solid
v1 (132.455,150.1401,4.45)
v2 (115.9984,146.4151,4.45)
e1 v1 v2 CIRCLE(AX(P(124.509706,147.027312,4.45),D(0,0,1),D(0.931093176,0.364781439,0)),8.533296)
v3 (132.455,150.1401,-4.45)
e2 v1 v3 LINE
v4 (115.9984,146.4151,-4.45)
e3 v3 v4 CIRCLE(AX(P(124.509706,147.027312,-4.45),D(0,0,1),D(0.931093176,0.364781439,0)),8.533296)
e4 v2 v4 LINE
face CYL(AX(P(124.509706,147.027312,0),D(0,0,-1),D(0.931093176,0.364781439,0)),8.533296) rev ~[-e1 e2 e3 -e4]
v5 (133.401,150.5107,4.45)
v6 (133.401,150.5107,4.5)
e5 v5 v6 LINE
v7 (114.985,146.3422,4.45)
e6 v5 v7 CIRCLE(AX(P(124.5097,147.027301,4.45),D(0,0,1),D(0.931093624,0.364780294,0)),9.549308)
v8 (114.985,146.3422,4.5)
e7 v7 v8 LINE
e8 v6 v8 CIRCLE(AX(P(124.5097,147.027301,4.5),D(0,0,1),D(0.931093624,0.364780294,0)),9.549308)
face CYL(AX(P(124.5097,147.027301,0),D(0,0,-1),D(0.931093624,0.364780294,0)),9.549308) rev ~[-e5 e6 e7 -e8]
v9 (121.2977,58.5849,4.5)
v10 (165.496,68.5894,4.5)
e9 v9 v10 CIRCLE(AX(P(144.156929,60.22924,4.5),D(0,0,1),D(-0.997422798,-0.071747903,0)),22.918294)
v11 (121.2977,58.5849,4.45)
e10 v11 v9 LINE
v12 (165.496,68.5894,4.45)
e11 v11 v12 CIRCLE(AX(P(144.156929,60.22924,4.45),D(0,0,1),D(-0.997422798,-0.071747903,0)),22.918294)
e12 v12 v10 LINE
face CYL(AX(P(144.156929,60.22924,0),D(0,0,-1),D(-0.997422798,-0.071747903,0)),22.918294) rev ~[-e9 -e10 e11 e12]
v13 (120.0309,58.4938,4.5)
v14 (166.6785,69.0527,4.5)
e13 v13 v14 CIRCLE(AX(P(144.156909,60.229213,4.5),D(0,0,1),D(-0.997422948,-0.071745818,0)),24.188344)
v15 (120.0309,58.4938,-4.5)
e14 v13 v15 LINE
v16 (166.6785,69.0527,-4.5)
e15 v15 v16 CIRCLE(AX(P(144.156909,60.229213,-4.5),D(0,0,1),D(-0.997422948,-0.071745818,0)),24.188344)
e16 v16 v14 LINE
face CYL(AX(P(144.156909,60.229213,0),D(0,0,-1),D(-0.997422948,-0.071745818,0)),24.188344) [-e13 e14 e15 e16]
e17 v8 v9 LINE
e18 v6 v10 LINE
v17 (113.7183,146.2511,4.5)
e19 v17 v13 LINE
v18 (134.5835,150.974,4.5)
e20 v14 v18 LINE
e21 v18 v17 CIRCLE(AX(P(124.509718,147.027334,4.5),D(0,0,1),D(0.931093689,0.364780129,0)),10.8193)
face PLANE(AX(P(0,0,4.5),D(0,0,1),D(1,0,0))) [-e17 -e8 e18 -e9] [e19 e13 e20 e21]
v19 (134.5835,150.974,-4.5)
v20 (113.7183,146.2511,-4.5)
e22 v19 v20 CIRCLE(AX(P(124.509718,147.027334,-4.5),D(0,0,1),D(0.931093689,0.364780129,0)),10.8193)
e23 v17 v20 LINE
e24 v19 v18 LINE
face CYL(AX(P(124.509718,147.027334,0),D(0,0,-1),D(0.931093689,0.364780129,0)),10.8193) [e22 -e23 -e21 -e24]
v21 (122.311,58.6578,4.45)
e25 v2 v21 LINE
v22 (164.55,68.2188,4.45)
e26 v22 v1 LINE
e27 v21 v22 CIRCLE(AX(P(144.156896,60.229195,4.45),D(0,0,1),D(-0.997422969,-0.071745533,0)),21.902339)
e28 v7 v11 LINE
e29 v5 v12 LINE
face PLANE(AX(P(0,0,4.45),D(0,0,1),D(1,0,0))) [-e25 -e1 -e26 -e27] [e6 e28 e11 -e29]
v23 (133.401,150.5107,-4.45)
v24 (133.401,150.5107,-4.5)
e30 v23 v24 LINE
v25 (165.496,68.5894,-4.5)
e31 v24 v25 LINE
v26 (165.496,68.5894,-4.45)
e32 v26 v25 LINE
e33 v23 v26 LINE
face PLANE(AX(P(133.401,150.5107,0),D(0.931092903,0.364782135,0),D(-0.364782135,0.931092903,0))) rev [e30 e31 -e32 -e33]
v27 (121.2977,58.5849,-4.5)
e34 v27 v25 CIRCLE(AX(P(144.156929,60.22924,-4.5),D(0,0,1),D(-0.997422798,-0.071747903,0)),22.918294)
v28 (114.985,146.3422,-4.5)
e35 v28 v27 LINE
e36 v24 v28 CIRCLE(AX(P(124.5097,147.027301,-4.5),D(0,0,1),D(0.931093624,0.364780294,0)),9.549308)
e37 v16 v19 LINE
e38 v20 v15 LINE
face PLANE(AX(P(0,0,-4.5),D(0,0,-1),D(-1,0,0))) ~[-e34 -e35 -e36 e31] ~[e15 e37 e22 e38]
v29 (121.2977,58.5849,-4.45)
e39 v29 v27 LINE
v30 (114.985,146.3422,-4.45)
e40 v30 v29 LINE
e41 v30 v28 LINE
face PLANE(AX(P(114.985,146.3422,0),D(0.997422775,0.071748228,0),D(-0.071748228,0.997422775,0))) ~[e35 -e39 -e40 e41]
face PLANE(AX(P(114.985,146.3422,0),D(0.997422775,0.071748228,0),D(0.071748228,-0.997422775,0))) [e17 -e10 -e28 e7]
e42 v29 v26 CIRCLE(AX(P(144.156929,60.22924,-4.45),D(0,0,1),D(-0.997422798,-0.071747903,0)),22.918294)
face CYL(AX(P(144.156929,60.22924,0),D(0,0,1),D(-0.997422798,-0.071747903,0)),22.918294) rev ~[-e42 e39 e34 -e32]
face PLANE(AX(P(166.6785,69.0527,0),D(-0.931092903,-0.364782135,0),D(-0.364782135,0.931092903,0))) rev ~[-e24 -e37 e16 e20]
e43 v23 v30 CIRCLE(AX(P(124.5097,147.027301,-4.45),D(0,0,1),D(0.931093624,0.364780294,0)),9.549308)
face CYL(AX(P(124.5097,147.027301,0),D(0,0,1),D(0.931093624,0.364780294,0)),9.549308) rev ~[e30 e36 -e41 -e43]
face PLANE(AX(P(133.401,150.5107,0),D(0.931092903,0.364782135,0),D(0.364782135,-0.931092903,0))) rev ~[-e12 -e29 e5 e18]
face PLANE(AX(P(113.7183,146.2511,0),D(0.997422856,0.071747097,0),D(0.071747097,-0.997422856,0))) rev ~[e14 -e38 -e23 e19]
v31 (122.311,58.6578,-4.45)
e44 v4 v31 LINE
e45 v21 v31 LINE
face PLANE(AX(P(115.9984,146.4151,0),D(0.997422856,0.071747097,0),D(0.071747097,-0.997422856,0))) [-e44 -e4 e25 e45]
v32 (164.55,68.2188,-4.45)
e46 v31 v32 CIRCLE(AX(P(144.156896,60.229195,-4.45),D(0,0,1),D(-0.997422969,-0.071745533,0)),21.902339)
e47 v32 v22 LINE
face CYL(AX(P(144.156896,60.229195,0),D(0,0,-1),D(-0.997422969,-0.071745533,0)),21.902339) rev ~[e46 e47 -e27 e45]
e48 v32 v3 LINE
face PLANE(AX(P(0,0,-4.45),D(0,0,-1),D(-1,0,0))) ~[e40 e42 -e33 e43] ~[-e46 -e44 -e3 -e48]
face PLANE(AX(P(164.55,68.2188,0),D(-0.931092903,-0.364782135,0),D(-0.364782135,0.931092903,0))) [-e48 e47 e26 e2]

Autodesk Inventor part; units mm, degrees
ref_plane "YZ Plane" through (0, 0, 0) normal (1, 0, 0) x (0, 1, 0)
ref_plane "XZ Plane" through (0, 0, 0) normal (0, 1, 0) x (-1, 0, 0)
ref_plane "XY Plane" through (0, 0, 0) normal (0, 0, 1) x (1, 0, 0)
sketch "Main Outline" plane through (0, 0, 0) normal (0, 0, 1) x (1, 0, 0)
  line L0 (0, 0) -> (304.8, 0) construction
  line L1 (304.8, 0) -> (304.8, 50.8) construction
  line L2 (304.8, 50.8) -> (0, 50.8) construction
  line L3 (0, 50.8) -> (0, 0) construction
  line L4 (0, 50.8) -> (0, 53.34) construction
  line L5 (0, 53.34) -> (304.8, 53.34) construction
  line L6 (304.8, 53.34) -> (304.8, 50.8) construction
  circle A0 centre (152.4, 23.8125) radius 17.4625 construction
  line L7 (152.4, 23.8125) -> (152.4, 0) construction
  circle A1 centre (152.4, 23.8125) radius 27.94 construction
  circle A2 centre (152.4, 23.8125) radius 21.59 construction
  line L8 (152.4, 23.8125) -> (144.1569, 60.2292) construction
  circle A3 centre (144.1569, 60.2292) radius 15.24 construction
  circle A4 centre (144.1569, 60.2292) radius 8.89 construction
  circle A5 centre (144.1569, 60.2292) radius 14.2875 construction
  arc A6 (163.8162, 72.0089) -> (128.198, 43.7805) centre (144.1569, 60.2292) ccw construction
  circle A7 centre (98.8106, 85.598) radius 32.258 construction
  circle A8 centre (124.5097, 147.0273) radius 32.258 construction
  circle A9 centre (174.158, 102.6533) radius 32.258 construction
  circle A10 centre (144.1569, 60.2292) radius 11.1125 construction
  circle A11 centre (152.4, 23.8125) radius 49.53 construction
  line L9 (144.1569, 60.2292) -> (124.5097, 147.0273) construction
  line L10 (144.1569, 60.2292) -> (98.8106, 85.598) construction
  line L11 (98.8106, 85.598) -> (174.158, 102.6533) construction
  line L12 (174.158, 102.6533) -> (144.1569, 60.2292) construction
  circle A12 centre (98.8106, 85.598) radius 9.5493 construction
  arc A13 (172.0498, 111.9669) -> (183.1109, 99.3313) centre (174.158, 102.6533) ccw construction
  circle A14 centre (124.5097, 147.0273) radius 9.5493 construction
  line L13 (96.7024, 94.9117) -> (172.0498, 111.9669) construction
  line L14 (183.1109, 99.3313) -> (165.6438, 52.2565) construction
  line L15 (92.161, 78.7444) -> (128.198, 43.7805) construction
  line L16 (172.0498, 111.9669) -> (174.158, 102.6533) construction
  line L17 (174.158, 102.6533) -> (183.1109, 99.3313) construction
  arc A15 (183.1109, 99.3313) -> (172.0498, 111.9669) centre (174.158, 102.6533) ccw construction
  arc A16 (165.6438, 52.2565) -> (163.8162, 72.0089) centre (144.1569, 60.2292) ccw construction
  arc A17 (128.198, 43.7805) -> (165.6438, 52.2565) centre (144.1569, 60.2292) ccw construction
  circle A18 centre (124.4396, 147.337) radius 32.258 construction
  circle A19 centre (124.3695, 147.6466) radius 32.258 construction
  circle A20 centre (124.2994, 147.9563) radius 32.258 construction
  line L18 (124.5097, 147.0273) -> (124.2994, 147.9563) construction
  circle A21 centre (124.5798, 146.7176) radius 32.258 construction
  circle A22 centre (117.4622, 43.2997) radius 9.525 construction
  circle A23 centre (175.54, 56.4459) radius 9.525 construction
  line L19 (152.4, 23.8125) -> (117.4622, 43.2997) construction
  line L20 (152.4, 23.8125) -> (175.54, 56.4459) construction
  line L21 (117.4622, 43.2997) -> (98.8106, 85.598) construction
  line L22 (175.54, 56.4459) -> (174.158, 102.6533) construction
  circle A24 centre (133.7342, 106.2753) radius 7.9375 construction
  line L23 (133.401, 150.5107) -> (165.496, 68.5894) construction
  circle A25 centre (152.4, 23.8125) radius 29.845 construction
  line L24 (114.985, 146.3422) -> (121.2977, 58.5849) construction
  circle A26 centre (99.0876, 85.443) radius 32.258 construction
  circle A27 centre (97.9793, 86.063) radius 32.258 construction
  line L25 (97.9793, 86.063) -> (98.8106, 85.598) construction
  circle A28 centre (98.2564, 85.908) radius 32.258 construction
  circle A29 centre (98.5335, 85.753) radius 32.258 construction
  circle A30 centre (152.4, 23.8125) radius 29.845 construction
  circle A31 centre (122.555, 23.8125) radius 6.35 construction
  circle A32 centre (179.3358, 36.6651) radius 6.35 construction
  line L26 (122.555, 23.8125) -> (152.4, 23.8125) construction
  line L27 (152.4, 23.8125) -> (182.245, 23.8125) construction
  circle A33 centre (182.245, 23.8125) radius 6.35 construction
  circle A34 centre (125.4642, 10.9599) radius 6.35 construction
  circle A35 centre (150.1885, 33.5827) radius 39.8623 construction
  line L28 (72.8944, 65.7819) -> (119.1902, 8.5205) construction
  circle A36 centre (174.708, 103.431) radius 32.258 construction
  line L29 (174.158, 102.6533) -> (174.708, 103.431) construction
  circle A37 centre (174.5246, 103.1717) radius 32.258 construction
  circle A38 centre (174.3413, 102.9125) radius 32.258 construction
  circle A39 centre (173.9747, 102.394) radius 32.258 construction
  line L30 (188.958, 24.3128) -> (206.0816, 95.9295) construction
  circle A40 centre (133.7342, 106.2753) radius 8.1693 construction
  arc A41 (85.4541, 115.7901) -> (94.2274, 135.7949) centre (79.2901, 130.4196) ccw construction
  arc A42 (156.6774, 149.9308) -> (173.2104, 135.6542) centre (172.4734, 151.5121) ccw construction
  line L31 (124.2994, 147.9563) -> (124.8602, 145.479) construction
  line L32 (114.3901, 145.7133) -> (114.9509, 143.236) construction
  line L33 (134.7695, 147.722) -> (134.2088, 150.1993) construction
  arc A43 (134.2088, 150.1993) -> (114.3901, 145.7133) centre (124.2994, 147.9563) ccw construction
  arc A44 (114.9509, 143.236) -> (134.7695, 147.722) centre (124.8602, 145.479) ccw construction
  line L34 (174.708, 103.431) -> (173.2414, 101.3571) construction
  line L35 (166.4126, 109.2972) -> (164.9461, 107.2234) construction
  line L36 (181.5368, 95.4909) -> (183.0033, 97.5647) construction
  arc A45 (183.0033, 97.5647) -> (166.4126, 109.2972) centre (174.708, 103.431) ccw construction
  arc A46 (164.9461, 107.2234) -> (181.5368, 95.4909) centre (173.2414, 101.3571) ccw construction
  line L37 (97.9793, 86.063) -> (100.196, 84.8229) construction
  line L38 (93.0188, 77.1963) -> (95.2355, 75.9562) construction
  line L39 (105.1564, 93.6897) -> (102.9398, 94.9298) construction
  arc A47 (102.9398, 94.9298) -> (93.0188, 77.1963) centre (97.9793, 86.063) ccw construction
  arc A48 (95.2355, 75.9562) -> (105.1564, 93.6897) centre (100.196, 84.8229) ccw construction
  circle A49 centre (117.4622, 43.2997) radius 3.9687 construction
  circle A50 centre (175.54, 56.4459) radius 3.9687 construction
  line L40 (152.4, 23.8125) -> (158.9889, -5.2961) construction
  arc A51 (89.3511, 54.6895) -> (85.9237, 49.6664) centre (88.3927, 51.6626) ccw construction
  arc A52 (201.2624, 75.7739) -> (196.006, 78.8314) centre (198.1744, 76.5122) ccw construction
  circle A53 centre (152.4, 23.8125) radius 14.224 construction
  circle A54 centre (133.7342, 106.2753) radius 3.9687 construction
  circle A55 centre (156.886, 3.9939) radius 6.35 construction
  circle A56 centre (156.886, 3.9939) radius 2.0828 construction
  circle A57 centre (152.4, 23.8125) radius 20.32 construction
  line L41 (132.9935, 29.8368) -> (152.4, 23.8125) construction
  line L42 (152.4, 23.8125) -> (167.3204, 37.6068) construction
  circle A58 centre (167.3204, 37.6068) radius 2.0828 construction
  circle A59 centre (167.3204, 37.6068) radius 3.9687 construction
  circle A60 centre (132.9935, 29.8368) radius 2.0828 construction
  circle A61 centre (132.9935, 29.8368) radius 3.9688 construction
  point P0 (173.9747, 102.394)
  point P1 (99.0876, 85.443)
  dimension "d18" = 99.06
  dimension "d58" = 64.516
  dimension "d86" = 64.516
  dimension "d0" = 304.8
  dimension "d1" = 50.8
  dimension "d2" = 2.54
  dimension "d3" = 34.925
  dimension "d4" = 23.8125
  dimension "d5" = 152.4
  dimension "d6" = 55.88
  dimension "d7" = 43.18
  dimension "d8" = 37.338
  dimension "d10" = 30.48
  dimension "d11" = 17.78
  dimension "d12" = 28.575
  dimension "d13" = 45.8366
  dimension "d14" = 64.516
  dimension "d15" = 64.516
  dimension "d16" = 64.516
  dimension "d17" = 22.225
  dimension "d19" = 51.9602
  dimension "d20" = 88.9939
  dimension "d21" = 19.0986
  dimension "d22" = 19.0986
  dimension "d23" = 19.0986
  dimension "d30" = 123.112
  dimension "d40" = 64.516
  dimension "d41" = 64.516
  dimension "d42" = 64.516
  dimension "d43" = 0.9525
  dimension "d44" = 0.3175
  dimension "d45" = 0.635
  dimension "d46" = 64.516
  dimension "d47" = 0.3175
  dimension "d48" = 19.05
  dimension "d49" = 19.05
  dimension "d50" = 40.005
  dimension "d51" = 40.005
  dimension "d52" = 46.228
  dimension "d54" = 46.228
  dimension "d55" = 15.875
  dimension "d56" = 41.4655
  dimension "d57" = 59.69
  dimension "d59" = 64.516
  dimension "d60" = 64.516
  dimension "d61" = 64.516
  dimension "d62" = 0.3175
  dimension "d63" = 0.3175
  dimension "d64" = 0.635
  dimension "d65" = 0.9525
  dimension "d73" = 12.7
  dimension "d74" = 12.7
  dimension "d76" = 59.69
  dimension "d78" = 12.7
  dimension "d79" = 12.7
  dimension "d80" = 64.516
  dimension "d81" = 0.9525
  dimension "d82" = 64.516
  dimension "d83" = 64.516
  dimension "d84" = 0.3175
  dimension "d85" = 0.635
  dimension "d88" = 0.3175
  dimension "d89" = 31.75
  dimension "d90" = 31.75
  dimension "d94" = 1.5875
  dimension "d95" = 20.32
  dimension "d96" = 1.5875
sketch "Upper CIM C-C Check" plane through (0, 0, 0) normal (0, 0, 1) x (1, 0, 0)
  arc A0 (3.4429, -22.6582) -> (3.4429, 22.6582) centre (0, 0) ccw construction
  arc A1 (90.4285, 9.4409) -> (90.4285, -9.4409) centre (88.9939, 0) ccw construction
  line L0 (88.9939, 0) -> (0, 0) construction
  line L1 (90.4285, 9.4409) -> (3.4429, 22.6582)
  line L2 (3.4429, -22.6582) -> (90.4285, -9.4409)
  arc A2 (90.4285, -9.4409) -> (90.4285, 9.4409) centre (88.9939, 0) ccw
  arc A3 (3.4429, 22.6582) -> (3.4429, -22.6582) centre (0, 0) ccw
  dimension "d24" = 45.8366
  dimension "d25" = 19.0986
  dimension "d26" = 78.9119
  dimension "d27" = 87.984
  dimension "d28" = 27.12
  dimension "d29" = 88.9939
sketch "Sketch3" plane through (0, 0, 0) normal (0, 0, 1) x (1, 0, 0)
  line L0 (114.985, 146.3422) -> (121.2977, 58.5849) projected
  line L1 (133.401, 150.5107) -> (165.496, 68.5894) projected
  arc A0 (133.401, 150.5107) -> (114.985, 146.3422) centre (124.5097, 147.0273) ccw
  arc A1 (121.2977, 58.5849) -> (165.496, 68.5894) centre (144.1569, 60.2292) ccw
  line L2 (164.55, 68.2188) -> (132.455, 150.1401)
  arc A2 (132.455, 150.1401) -> (115.9984, 146.4151) centre (124.5097, 147.0273) ccw
  line L3 (115.9984, 146.4151) -> (122.311, 58.6578)
  arc A3 (122.311, 58.6578) -> (164.55, 68.2188) centre (144.1569, 60.2292) ccw
  line L4 (166.6785, 69.0527) -> (134.5835, 150.974)
  arc A4 (134.5835, 150.974) -> (113.7183, 146.2511) centre (124.5097, 147.0273) ccw
  line L5 (113.7183, 146.2511) -> (120.0309, 58.4938)
  arc A5 (120.0309, 58.4938) -> (166.6785, 69.0527) centre (144.1569, 60.2292) ccw
  point P0 (0, 0)
  dimension "d115" = 1.27
  dimension "d116" = 1.016
extrude "Extrusion1" add sketch "Sketch3" along normal blind 4.5 contours A5 L5 A4 L4
extrude "Extrusion2" add sketch "Sketch3" along normal blind 4.45 contours A0 L1 A1 L0
mirror "Mirror1" about plane through (136.0096, 96.2228, 0) normal (0, 0, -1)
equation "\"d3\" = r10"
equation "\"d6\" = g44"
equation "\"d7\" = g34"
equation "\"d10\" = g24"
equation "\"d11\" = g14"
equation "\"d12\" = r8"
equation "\"d13\" = p48"
equation "\"d14\" = cim"
equation "\"d15\" = cim"
equation "\"d16\" = cim"
equation "\"d17\" = r6"
equation "\"d21\" = p20"
equation "\"d22\" = p20"
equation "\"d23\" = p20"
equation "\"d24\" = p48"
equation "\"d25\" = p20"
equation "\"d29\" = d20"
equation "\"g14\" = 17.78"
equation "\"g24\" = 30.48"
equation "\"g34\" = 43.18"
equation "\"g44\" = 55.88"
equation "\"p20\" = 19.09859"
equation "\"p48\" = 45.83662"
equation "\"r10\" = 34.925"
equation "\"r9\" = 31.75"
equation "\"r8\" = 28.575"
equation "\"r7\" = 25.4"
equation "\"r6\" = 22.225"
equation "\"r5\" = 19.05"
equation "\"r4\" = 15.875"
equation "\"r3\" = 12.7"
equation "\"cim\" = 64.516"
equation "\"act\" = 28.448"
equation "\"actL\" = 23.749"
equation "\"UpperCimCCCheck\" = 2 * d27 + d26 + d28"
equation "\"LowerBeltPathCCCheck\" = 267"
properties material "Rubber"
